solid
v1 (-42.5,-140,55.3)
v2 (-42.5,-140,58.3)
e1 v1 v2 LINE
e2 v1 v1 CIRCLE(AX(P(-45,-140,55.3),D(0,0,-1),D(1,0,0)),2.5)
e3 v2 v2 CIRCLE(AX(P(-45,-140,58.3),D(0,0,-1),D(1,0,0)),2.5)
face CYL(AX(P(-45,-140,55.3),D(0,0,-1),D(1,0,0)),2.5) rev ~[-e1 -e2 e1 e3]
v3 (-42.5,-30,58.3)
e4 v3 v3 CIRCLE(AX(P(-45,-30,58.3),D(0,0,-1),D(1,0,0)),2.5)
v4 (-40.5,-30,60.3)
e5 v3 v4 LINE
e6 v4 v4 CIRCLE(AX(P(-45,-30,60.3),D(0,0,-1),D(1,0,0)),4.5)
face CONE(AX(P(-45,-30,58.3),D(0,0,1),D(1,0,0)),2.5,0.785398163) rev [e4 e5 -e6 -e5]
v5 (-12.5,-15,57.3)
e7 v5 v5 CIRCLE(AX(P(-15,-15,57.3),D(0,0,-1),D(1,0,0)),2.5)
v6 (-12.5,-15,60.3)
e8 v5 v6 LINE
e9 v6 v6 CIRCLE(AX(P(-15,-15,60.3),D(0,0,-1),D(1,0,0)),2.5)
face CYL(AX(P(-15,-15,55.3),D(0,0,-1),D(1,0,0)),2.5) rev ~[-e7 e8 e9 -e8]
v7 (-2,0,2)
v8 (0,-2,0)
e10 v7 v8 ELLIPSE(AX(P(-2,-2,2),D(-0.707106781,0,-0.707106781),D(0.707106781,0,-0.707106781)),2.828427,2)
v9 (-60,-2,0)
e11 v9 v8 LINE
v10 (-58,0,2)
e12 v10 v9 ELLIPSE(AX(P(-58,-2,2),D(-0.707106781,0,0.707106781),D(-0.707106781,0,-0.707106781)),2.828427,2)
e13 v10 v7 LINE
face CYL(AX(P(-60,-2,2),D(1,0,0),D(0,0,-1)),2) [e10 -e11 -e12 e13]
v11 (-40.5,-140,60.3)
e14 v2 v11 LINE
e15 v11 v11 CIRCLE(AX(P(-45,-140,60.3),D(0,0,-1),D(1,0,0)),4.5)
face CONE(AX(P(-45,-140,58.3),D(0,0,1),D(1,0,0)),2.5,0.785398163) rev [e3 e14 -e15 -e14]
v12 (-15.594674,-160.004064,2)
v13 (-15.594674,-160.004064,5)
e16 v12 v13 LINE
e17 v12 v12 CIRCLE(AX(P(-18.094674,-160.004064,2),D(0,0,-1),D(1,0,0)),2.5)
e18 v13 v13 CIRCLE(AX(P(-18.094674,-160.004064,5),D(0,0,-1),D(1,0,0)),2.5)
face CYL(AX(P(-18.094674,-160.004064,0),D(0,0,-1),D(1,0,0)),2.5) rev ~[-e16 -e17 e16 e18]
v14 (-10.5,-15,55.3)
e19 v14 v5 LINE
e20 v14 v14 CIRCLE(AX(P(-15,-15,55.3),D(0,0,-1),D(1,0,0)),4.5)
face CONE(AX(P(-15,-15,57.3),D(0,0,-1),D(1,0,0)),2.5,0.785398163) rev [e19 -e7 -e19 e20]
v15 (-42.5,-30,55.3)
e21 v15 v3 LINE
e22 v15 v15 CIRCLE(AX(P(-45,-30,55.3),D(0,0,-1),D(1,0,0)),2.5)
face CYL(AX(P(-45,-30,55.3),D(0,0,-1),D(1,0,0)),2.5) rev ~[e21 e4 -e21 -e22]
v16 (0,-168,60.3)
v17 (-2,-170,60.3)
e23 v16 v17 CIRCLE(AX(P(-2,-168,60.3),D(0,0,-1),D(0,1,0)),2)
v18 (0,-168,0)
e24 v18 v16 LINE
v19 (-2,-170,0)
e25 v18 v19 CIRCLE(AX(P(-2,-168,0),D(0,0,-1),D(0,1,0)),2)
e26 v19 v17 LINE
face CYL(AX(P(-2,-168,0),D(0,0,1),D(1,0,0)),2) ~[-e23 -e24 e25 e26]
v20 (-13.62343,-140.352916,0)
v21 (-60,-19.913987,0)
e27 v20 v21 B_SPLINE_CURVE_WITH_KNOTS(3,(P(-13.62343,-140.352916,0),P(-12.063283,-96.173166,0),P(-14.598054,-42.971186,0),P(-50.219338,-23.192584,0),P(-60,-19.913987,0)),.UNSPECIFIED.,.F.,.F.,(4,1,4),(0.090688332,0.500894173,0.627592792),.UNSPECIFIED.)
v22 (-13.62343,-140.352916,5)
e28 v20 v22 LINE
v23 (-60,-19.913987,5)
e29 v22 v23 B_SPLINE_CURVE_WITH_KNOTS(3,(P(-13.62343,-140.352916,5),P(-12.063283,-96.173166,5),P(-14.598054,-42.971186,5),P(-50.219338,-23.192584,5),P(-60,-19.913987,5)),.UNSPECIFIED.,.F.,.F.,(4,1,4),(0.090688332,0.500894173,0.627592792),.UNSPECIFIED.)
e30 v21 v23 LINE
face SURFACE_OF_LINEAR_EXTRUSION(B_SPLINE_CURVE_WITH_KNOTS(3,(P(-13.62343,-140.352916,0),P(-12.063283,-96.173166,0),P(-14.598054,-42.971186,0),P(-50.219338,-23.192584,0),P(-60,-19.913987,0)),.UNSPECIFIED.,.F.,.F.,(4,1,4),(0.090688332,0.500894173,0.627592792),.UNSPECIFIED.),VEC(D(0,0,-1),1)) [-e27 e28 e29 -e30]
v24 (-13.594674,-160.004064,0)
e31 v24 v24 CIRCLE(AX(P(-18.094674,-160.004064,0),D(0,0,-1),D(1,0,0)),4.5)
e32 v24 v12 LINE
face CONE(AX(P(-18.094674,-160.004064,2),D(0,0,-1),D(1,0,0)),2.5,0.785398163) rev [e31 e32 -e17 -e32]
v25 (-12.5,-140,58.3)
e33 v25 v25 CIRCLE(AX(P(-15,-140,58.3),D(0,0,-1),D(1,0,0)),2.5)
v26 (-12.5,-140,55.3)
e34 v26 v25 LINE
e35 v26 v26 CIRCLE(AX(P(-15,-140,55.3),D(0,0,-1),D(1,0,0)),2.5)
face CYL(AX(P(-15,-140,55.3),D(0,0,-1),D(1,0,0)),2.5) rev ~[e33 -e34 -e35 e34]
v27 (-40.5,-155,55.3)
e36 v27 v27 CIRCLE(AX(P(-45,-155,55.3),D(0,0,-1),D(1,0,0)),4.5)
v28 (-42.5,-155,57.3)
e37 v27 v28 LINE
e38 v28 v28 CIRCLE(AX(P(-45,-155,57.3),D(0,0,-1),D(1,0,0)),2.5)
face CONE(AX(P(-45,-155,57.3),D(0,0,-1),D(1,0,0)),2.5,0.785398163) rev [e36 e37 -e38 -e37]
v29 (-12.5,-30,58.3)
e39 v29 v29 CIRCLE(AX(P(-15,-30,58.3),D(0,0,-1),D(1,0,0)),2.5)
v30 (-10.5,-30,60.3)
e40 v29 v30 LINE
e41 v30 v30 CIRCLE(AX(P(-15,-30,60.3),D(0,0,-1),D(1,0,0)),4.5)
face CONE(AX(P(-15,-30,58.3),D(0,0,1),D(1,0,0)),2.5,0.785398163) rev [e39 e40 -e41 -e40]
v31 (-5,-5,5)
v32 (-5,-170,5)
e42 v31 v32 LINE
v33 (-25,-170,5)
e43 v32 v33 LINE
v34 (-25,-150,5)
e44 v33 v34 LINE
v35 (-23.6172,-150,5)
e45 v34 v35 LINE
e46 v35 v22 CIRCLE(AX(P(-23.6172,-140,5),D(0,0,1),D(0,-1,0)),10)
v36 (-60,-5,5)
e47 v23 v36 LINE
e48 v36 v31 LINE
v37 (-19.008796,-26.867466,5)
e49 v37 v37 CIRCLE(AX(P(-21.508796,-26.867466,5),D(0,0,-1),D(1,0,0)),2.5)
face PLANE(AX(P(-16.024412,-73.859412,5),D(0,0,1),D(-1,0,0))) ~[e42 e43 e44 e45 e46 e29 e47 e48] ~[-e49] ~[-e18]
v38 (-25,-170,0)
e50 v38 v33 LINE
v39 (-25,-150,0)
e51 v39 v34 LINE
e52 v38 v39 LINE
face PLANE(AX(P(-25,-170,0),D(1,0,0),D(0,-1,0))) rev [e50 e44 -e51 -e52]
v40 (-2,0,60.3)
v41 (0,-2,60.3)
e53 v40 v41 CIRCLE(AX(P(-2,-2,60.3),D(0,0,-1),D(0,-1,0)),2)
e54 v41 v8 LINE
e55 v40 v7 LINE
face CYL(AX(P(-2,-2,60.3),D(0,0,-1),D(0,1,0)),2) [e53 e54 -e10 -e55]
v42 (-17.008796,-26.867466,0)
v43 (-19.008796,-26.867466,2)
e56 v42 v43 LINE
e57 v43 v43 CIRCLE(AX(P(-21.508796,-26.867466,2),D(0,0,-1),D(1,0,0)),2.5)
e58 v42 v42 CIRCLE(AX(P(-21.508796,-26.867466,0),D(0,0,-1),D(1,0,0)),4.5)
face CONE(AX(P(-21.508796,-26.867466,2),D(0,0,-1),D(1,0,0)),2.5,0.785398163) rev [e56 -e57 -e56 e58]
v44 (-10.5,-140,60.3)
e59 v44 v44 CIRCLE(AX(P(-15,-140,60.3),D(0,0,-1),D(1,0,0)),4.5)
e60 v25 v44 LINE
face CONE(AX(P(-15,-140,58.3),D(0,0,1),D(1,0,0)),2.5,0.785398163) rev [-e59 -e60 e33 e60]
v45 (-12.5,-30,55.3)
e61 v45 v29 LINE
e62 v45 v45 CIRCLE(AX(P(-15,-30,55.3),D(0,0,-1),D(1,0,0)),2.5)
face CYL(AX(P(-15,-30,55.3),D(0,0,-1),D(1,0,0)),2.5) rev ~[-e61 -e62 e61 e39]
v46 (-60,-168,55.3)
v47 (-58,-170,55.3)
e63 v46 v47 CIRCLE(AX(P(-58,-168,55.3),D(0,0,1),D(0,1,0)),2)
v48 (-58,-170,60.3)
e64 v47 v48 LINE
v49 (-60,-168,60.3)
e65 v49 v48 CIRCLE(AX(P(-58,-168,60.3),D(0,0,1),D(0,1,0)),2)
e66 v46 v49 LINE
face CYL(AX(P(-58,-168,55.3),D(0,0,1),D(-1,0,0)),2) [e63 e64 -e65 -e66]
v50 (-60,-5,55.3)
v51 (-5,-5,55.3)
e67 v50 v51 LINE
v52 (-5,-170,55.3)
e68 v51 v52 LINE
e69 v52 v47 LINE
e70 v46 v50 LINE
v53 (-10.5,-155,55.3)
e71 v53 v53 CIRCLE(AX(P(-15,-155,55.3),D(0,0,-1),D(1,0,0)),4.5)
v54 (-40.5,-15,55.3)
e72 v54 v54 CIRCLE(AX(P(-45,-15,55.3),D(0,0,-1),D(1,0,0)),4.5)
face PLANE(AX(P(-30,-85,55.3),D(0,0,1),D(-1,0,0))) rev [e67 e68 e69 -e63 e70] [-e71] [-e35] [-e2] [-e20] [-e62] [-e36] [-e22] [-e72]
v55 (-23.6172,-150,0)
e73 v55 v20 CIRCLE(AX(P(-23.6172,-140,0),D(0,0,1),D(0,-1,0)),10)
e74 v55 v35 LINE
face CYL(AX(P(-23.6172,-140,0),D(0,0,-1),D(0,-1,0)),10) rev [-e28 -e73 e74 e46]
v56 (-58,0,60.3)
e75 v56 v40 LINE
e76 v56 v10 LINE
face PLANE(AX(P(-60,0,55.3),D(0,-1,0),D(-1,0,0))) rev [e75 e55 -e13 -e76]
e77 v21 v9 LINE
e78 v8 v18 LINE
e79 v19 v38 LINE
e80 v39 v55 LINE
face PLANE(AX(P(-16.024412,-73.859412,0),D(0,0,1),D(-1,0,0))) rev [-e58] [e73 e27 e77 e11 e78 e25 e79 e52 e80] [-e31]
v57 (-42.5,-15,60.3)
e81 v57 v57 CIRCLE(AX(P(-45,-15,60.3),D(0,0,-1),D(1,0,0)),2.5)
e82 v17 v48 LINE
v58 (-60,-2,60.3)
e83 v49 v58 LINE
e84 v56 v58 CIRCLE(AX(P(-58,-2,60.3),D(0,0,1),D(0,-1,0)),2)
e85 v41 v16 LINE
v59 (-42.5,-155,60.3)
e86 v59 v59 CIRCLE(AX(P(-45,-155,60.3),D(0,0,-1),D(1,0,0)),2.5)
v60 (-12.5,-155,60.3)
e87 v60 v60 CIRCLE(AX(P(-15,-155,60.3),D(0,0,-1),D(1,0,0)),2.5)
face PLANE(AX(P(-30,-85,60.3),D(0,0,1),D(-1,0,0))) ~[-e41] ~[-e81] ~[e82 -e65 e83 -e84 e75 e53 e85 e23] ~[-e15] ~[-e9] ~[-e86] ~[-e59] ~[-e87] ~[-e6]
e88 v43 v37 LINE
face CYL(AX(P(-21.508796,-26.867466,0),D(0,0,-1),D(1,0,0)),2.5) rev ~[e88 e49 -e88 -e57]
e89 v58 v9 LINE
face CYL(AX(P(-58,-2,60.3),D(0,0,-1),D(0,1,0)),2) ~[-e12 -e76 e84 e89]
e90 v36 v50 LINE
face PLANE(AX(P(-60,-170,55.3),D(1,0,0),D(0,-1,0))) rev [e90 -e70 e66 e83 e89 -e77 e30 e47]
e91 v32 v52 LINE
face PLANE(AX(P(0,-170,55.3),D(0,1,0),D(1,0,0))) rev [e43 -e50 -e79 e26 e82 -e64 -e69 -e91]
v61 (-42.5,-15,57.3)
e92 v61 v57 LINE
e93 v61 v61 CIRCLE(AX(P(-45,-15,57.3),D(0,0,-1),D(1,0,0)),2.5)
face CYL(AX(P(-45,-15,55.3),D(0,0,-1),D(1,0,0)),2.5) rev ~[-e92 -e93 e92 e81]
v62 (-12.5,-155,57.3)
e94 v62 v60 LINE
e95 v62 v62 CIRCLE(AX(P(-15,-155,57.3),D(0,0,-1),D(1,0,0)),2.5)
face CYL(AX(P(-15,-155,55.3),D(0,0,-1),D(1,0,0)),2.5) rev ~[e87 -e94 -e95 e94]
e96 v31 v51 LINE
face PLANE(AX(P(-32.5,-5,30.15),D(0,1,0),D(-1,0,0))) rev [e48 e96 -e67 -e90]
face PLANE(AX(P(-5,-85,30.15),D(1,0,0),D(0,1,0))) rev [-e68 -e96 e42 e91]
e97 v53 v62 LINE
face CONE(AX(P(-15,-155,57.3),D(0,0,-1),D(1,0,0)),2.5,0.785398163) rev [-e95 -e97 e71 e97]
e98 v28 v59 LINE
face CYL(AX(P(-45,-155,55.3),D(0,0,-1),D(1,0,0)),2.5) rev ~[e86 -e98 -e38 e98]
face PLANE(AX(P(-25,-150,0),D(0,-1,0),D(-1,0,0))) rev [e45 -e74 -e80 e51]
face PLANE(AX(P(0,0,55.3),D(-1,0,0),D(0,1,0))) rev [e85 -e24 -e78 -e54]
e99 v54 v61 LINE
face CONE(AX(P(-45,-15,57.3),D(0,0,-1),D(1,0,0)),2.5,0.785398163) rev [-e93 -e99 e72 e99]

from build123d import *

# Parameters (mm, degrees)
F0_R     = 2.5
F1_DEPTH = 5
F2_W     = 170
F2_H     = 50.3
F3_DEPTH = 5
F4_W     = 55
F4_H     = 50.3
F5_DEPTH = 5
F7_R     = 2.5
F8_DEPTH = 5
F9_SIZE  = 2
F10_SIZE = 2
F11_SIZE = 2
F12_R    = 2


# Not quite as in the source:
# - a feature names something its author has since deleted; it is built from what else it names


with BuildPart() as f1:
    # F0 (on Top) → F1 (new body)
    with BuildSketch(Plane.XY):
        with BuildLine():
            Line((-60, 0), (0, 0))
            Line((0, 0), (0, 150))
            Line((0, 150), (0, 170))
            Line((0, 170), (-15, 170))
            add(Edge.make_bspline(
                [(-15, 170), (-14.4841735922, 160.0600889734), (-13.9683471845, 150.1201779469), (-13.6234299021, 140.3529161241)],
                knots=[0, 0, 0, 0, 0.0906883322, 0.0906883322, 0.0906883322, 0.0906883322], degree=3))
            add(Edge.make_bspline(
                [(-13.6234299021, 140.3529161241), (-12.0632834056, 96.1731661082), (-14.5980537911, 42.9711861088), (-50.2193379026, 23.1925838291), (-60, 19.9139873857)],
                knots=[0.0906883322, 0.0906883322, 0.0906883322, 0.0906883322, 0.5008941728, 0.6275927921, 0.6275927921, 0.6275927921, 0.6275927921], degree=3))
            Line((-60, 19.9139873857), (-60, 0))
        make_face()
        with Locations((-21.5087961406, 26.8674660474)):
            Circle(F0_R, mode=Mode.SUBTRACT)
        with BuildLine():
            ThreePointArc((-23.6172004723, 150), (-16.6720280929, 147.1947606368), (-13.6234299021, 140.3529161241))
            add(Edge.make_bspline(
                [(-15, 170), (-14.4841735922, 160.0600889734), (-13.9683471845, 150.1201779469), (-13.6234299021, 140.3529161241)],
                knots=[0, 0, 0, 0, 0.0906883322, 0.0906883322, 0.0906883322, 0.0906883322], degree=3))
            Line((-15, 170), (-25, 170))
            Line((-25, 170), (-25, 150))
            Line((-25, 150), (-23.6172004723, 150))
        make_face()
        with Locations((-18.0946737528, 160.0040644407)):
            Circle(F0_R, mode=Mode.SUBTRACT)
    extrude(amount=F1_DEPTH)

    # F2 (on face) → F3 (join)
    with BuildSketch(Plane.YZ):
        with Locations((85, 30.15)):
            Rectangle(F2_W, F2_H)
    extrude(amount=-F3_DEPTH)

    # F4 (on face) → F5 (join)
    with BuildSketch(Plane.XZ):
        with Locations((-32.5, 30.15)):
            Rectangle(F4_W, F4_H)
    extrude(amount=-F5_DEPTH)

    # F7 (on face) → F8 (join)
    with BuildSketch(Plane.XY.offset(55.3)):
        Polygon((-15, 0), (0, 0), (0, 15), (0, 155), (0, 170), (-15, 170), (-45, 170), (-60, 170), (-60, 155), (-60, 15), (-60, 0), (-45, 0), align=None)
        with Locations((-45, 15)):
            Circle(F7_R, mode=Mode.SUBTRACT)
        with Locations((-45, 30)):
            Circle(F7_R, mode=Mode.SUBTRACT)
        with Locations((-15, 15)):
            Circle(F7_R, mode=Mode.SUBTRACT)
        with Locations((-15, 30)):
            Circle(F7_R, mode=Mode.SUBTRACT)
        with Locations((-45, 140)):
            Circle(F7_R, mode=Mode.SUBTRACT)
        with Locations((-45, 155)):
            Circle(F7_R, mode=Mode.SUBTRACT)
        with Locations((-15, 140)):
            Circle(F7_R, mode=Mode.SUBTRACT)
        with Locations((-15, 155)):
            Circle(F7_R, mode=Mode.SUBTRACT)
    extrude(amount=F8_DEPTH)

    # F9
    f9_edges = [f1.edges().sort_by_distance(p)[0] for p in [
        (-17.5, 140, 60.3),
        (-47.5, 140, 60.3),
        (-17.5, 30, 60.3),
        (-47.5, 30, 60.3),
    ]]
    chamfer(f9_edges, length=F9_SIZE)

    # F10
    f10_edges = [f1.edges().sort_by_distance(p)[0] for p in [
        (-47.5, 155, 55.3),
        (-17.5, 155, 55.3),
        (-47.5, 15, 55.3),
        (-17.5, 15, 55.3),
    ]]
    chamfer(f10_edges, length=F10_SIZE)

    # F11
    f11_edges = [f1.edges().sort_by_distance(p)[0] for p in [
        (-24.008796, 26.867466, 0),
        (-20.594674, 160.004064, 0),
    ]]
    chamfer(f11_edges, length=F11_SIZE)

    # F12
    f12_edges = [f1.edges().sort_by_distance(p)[0] for p in [
        (0, 0, 30.15),
        (-60, 0, 30.15),
        (-30, 0, 0),
        (0, 170, 30.15),
        (-60, 170, 57.8),
    ]]
    fillet(f12_edges, radius=F12_R)


with BuildPart() as f13_1:
    # F13: instance of F1
    add(f1.part.mirror(Plane(origin=(-30, 0, 31.15), x_dir=(1, 0, 0), z_dir=(0, -1, 0))))


solid = f13_1.part
